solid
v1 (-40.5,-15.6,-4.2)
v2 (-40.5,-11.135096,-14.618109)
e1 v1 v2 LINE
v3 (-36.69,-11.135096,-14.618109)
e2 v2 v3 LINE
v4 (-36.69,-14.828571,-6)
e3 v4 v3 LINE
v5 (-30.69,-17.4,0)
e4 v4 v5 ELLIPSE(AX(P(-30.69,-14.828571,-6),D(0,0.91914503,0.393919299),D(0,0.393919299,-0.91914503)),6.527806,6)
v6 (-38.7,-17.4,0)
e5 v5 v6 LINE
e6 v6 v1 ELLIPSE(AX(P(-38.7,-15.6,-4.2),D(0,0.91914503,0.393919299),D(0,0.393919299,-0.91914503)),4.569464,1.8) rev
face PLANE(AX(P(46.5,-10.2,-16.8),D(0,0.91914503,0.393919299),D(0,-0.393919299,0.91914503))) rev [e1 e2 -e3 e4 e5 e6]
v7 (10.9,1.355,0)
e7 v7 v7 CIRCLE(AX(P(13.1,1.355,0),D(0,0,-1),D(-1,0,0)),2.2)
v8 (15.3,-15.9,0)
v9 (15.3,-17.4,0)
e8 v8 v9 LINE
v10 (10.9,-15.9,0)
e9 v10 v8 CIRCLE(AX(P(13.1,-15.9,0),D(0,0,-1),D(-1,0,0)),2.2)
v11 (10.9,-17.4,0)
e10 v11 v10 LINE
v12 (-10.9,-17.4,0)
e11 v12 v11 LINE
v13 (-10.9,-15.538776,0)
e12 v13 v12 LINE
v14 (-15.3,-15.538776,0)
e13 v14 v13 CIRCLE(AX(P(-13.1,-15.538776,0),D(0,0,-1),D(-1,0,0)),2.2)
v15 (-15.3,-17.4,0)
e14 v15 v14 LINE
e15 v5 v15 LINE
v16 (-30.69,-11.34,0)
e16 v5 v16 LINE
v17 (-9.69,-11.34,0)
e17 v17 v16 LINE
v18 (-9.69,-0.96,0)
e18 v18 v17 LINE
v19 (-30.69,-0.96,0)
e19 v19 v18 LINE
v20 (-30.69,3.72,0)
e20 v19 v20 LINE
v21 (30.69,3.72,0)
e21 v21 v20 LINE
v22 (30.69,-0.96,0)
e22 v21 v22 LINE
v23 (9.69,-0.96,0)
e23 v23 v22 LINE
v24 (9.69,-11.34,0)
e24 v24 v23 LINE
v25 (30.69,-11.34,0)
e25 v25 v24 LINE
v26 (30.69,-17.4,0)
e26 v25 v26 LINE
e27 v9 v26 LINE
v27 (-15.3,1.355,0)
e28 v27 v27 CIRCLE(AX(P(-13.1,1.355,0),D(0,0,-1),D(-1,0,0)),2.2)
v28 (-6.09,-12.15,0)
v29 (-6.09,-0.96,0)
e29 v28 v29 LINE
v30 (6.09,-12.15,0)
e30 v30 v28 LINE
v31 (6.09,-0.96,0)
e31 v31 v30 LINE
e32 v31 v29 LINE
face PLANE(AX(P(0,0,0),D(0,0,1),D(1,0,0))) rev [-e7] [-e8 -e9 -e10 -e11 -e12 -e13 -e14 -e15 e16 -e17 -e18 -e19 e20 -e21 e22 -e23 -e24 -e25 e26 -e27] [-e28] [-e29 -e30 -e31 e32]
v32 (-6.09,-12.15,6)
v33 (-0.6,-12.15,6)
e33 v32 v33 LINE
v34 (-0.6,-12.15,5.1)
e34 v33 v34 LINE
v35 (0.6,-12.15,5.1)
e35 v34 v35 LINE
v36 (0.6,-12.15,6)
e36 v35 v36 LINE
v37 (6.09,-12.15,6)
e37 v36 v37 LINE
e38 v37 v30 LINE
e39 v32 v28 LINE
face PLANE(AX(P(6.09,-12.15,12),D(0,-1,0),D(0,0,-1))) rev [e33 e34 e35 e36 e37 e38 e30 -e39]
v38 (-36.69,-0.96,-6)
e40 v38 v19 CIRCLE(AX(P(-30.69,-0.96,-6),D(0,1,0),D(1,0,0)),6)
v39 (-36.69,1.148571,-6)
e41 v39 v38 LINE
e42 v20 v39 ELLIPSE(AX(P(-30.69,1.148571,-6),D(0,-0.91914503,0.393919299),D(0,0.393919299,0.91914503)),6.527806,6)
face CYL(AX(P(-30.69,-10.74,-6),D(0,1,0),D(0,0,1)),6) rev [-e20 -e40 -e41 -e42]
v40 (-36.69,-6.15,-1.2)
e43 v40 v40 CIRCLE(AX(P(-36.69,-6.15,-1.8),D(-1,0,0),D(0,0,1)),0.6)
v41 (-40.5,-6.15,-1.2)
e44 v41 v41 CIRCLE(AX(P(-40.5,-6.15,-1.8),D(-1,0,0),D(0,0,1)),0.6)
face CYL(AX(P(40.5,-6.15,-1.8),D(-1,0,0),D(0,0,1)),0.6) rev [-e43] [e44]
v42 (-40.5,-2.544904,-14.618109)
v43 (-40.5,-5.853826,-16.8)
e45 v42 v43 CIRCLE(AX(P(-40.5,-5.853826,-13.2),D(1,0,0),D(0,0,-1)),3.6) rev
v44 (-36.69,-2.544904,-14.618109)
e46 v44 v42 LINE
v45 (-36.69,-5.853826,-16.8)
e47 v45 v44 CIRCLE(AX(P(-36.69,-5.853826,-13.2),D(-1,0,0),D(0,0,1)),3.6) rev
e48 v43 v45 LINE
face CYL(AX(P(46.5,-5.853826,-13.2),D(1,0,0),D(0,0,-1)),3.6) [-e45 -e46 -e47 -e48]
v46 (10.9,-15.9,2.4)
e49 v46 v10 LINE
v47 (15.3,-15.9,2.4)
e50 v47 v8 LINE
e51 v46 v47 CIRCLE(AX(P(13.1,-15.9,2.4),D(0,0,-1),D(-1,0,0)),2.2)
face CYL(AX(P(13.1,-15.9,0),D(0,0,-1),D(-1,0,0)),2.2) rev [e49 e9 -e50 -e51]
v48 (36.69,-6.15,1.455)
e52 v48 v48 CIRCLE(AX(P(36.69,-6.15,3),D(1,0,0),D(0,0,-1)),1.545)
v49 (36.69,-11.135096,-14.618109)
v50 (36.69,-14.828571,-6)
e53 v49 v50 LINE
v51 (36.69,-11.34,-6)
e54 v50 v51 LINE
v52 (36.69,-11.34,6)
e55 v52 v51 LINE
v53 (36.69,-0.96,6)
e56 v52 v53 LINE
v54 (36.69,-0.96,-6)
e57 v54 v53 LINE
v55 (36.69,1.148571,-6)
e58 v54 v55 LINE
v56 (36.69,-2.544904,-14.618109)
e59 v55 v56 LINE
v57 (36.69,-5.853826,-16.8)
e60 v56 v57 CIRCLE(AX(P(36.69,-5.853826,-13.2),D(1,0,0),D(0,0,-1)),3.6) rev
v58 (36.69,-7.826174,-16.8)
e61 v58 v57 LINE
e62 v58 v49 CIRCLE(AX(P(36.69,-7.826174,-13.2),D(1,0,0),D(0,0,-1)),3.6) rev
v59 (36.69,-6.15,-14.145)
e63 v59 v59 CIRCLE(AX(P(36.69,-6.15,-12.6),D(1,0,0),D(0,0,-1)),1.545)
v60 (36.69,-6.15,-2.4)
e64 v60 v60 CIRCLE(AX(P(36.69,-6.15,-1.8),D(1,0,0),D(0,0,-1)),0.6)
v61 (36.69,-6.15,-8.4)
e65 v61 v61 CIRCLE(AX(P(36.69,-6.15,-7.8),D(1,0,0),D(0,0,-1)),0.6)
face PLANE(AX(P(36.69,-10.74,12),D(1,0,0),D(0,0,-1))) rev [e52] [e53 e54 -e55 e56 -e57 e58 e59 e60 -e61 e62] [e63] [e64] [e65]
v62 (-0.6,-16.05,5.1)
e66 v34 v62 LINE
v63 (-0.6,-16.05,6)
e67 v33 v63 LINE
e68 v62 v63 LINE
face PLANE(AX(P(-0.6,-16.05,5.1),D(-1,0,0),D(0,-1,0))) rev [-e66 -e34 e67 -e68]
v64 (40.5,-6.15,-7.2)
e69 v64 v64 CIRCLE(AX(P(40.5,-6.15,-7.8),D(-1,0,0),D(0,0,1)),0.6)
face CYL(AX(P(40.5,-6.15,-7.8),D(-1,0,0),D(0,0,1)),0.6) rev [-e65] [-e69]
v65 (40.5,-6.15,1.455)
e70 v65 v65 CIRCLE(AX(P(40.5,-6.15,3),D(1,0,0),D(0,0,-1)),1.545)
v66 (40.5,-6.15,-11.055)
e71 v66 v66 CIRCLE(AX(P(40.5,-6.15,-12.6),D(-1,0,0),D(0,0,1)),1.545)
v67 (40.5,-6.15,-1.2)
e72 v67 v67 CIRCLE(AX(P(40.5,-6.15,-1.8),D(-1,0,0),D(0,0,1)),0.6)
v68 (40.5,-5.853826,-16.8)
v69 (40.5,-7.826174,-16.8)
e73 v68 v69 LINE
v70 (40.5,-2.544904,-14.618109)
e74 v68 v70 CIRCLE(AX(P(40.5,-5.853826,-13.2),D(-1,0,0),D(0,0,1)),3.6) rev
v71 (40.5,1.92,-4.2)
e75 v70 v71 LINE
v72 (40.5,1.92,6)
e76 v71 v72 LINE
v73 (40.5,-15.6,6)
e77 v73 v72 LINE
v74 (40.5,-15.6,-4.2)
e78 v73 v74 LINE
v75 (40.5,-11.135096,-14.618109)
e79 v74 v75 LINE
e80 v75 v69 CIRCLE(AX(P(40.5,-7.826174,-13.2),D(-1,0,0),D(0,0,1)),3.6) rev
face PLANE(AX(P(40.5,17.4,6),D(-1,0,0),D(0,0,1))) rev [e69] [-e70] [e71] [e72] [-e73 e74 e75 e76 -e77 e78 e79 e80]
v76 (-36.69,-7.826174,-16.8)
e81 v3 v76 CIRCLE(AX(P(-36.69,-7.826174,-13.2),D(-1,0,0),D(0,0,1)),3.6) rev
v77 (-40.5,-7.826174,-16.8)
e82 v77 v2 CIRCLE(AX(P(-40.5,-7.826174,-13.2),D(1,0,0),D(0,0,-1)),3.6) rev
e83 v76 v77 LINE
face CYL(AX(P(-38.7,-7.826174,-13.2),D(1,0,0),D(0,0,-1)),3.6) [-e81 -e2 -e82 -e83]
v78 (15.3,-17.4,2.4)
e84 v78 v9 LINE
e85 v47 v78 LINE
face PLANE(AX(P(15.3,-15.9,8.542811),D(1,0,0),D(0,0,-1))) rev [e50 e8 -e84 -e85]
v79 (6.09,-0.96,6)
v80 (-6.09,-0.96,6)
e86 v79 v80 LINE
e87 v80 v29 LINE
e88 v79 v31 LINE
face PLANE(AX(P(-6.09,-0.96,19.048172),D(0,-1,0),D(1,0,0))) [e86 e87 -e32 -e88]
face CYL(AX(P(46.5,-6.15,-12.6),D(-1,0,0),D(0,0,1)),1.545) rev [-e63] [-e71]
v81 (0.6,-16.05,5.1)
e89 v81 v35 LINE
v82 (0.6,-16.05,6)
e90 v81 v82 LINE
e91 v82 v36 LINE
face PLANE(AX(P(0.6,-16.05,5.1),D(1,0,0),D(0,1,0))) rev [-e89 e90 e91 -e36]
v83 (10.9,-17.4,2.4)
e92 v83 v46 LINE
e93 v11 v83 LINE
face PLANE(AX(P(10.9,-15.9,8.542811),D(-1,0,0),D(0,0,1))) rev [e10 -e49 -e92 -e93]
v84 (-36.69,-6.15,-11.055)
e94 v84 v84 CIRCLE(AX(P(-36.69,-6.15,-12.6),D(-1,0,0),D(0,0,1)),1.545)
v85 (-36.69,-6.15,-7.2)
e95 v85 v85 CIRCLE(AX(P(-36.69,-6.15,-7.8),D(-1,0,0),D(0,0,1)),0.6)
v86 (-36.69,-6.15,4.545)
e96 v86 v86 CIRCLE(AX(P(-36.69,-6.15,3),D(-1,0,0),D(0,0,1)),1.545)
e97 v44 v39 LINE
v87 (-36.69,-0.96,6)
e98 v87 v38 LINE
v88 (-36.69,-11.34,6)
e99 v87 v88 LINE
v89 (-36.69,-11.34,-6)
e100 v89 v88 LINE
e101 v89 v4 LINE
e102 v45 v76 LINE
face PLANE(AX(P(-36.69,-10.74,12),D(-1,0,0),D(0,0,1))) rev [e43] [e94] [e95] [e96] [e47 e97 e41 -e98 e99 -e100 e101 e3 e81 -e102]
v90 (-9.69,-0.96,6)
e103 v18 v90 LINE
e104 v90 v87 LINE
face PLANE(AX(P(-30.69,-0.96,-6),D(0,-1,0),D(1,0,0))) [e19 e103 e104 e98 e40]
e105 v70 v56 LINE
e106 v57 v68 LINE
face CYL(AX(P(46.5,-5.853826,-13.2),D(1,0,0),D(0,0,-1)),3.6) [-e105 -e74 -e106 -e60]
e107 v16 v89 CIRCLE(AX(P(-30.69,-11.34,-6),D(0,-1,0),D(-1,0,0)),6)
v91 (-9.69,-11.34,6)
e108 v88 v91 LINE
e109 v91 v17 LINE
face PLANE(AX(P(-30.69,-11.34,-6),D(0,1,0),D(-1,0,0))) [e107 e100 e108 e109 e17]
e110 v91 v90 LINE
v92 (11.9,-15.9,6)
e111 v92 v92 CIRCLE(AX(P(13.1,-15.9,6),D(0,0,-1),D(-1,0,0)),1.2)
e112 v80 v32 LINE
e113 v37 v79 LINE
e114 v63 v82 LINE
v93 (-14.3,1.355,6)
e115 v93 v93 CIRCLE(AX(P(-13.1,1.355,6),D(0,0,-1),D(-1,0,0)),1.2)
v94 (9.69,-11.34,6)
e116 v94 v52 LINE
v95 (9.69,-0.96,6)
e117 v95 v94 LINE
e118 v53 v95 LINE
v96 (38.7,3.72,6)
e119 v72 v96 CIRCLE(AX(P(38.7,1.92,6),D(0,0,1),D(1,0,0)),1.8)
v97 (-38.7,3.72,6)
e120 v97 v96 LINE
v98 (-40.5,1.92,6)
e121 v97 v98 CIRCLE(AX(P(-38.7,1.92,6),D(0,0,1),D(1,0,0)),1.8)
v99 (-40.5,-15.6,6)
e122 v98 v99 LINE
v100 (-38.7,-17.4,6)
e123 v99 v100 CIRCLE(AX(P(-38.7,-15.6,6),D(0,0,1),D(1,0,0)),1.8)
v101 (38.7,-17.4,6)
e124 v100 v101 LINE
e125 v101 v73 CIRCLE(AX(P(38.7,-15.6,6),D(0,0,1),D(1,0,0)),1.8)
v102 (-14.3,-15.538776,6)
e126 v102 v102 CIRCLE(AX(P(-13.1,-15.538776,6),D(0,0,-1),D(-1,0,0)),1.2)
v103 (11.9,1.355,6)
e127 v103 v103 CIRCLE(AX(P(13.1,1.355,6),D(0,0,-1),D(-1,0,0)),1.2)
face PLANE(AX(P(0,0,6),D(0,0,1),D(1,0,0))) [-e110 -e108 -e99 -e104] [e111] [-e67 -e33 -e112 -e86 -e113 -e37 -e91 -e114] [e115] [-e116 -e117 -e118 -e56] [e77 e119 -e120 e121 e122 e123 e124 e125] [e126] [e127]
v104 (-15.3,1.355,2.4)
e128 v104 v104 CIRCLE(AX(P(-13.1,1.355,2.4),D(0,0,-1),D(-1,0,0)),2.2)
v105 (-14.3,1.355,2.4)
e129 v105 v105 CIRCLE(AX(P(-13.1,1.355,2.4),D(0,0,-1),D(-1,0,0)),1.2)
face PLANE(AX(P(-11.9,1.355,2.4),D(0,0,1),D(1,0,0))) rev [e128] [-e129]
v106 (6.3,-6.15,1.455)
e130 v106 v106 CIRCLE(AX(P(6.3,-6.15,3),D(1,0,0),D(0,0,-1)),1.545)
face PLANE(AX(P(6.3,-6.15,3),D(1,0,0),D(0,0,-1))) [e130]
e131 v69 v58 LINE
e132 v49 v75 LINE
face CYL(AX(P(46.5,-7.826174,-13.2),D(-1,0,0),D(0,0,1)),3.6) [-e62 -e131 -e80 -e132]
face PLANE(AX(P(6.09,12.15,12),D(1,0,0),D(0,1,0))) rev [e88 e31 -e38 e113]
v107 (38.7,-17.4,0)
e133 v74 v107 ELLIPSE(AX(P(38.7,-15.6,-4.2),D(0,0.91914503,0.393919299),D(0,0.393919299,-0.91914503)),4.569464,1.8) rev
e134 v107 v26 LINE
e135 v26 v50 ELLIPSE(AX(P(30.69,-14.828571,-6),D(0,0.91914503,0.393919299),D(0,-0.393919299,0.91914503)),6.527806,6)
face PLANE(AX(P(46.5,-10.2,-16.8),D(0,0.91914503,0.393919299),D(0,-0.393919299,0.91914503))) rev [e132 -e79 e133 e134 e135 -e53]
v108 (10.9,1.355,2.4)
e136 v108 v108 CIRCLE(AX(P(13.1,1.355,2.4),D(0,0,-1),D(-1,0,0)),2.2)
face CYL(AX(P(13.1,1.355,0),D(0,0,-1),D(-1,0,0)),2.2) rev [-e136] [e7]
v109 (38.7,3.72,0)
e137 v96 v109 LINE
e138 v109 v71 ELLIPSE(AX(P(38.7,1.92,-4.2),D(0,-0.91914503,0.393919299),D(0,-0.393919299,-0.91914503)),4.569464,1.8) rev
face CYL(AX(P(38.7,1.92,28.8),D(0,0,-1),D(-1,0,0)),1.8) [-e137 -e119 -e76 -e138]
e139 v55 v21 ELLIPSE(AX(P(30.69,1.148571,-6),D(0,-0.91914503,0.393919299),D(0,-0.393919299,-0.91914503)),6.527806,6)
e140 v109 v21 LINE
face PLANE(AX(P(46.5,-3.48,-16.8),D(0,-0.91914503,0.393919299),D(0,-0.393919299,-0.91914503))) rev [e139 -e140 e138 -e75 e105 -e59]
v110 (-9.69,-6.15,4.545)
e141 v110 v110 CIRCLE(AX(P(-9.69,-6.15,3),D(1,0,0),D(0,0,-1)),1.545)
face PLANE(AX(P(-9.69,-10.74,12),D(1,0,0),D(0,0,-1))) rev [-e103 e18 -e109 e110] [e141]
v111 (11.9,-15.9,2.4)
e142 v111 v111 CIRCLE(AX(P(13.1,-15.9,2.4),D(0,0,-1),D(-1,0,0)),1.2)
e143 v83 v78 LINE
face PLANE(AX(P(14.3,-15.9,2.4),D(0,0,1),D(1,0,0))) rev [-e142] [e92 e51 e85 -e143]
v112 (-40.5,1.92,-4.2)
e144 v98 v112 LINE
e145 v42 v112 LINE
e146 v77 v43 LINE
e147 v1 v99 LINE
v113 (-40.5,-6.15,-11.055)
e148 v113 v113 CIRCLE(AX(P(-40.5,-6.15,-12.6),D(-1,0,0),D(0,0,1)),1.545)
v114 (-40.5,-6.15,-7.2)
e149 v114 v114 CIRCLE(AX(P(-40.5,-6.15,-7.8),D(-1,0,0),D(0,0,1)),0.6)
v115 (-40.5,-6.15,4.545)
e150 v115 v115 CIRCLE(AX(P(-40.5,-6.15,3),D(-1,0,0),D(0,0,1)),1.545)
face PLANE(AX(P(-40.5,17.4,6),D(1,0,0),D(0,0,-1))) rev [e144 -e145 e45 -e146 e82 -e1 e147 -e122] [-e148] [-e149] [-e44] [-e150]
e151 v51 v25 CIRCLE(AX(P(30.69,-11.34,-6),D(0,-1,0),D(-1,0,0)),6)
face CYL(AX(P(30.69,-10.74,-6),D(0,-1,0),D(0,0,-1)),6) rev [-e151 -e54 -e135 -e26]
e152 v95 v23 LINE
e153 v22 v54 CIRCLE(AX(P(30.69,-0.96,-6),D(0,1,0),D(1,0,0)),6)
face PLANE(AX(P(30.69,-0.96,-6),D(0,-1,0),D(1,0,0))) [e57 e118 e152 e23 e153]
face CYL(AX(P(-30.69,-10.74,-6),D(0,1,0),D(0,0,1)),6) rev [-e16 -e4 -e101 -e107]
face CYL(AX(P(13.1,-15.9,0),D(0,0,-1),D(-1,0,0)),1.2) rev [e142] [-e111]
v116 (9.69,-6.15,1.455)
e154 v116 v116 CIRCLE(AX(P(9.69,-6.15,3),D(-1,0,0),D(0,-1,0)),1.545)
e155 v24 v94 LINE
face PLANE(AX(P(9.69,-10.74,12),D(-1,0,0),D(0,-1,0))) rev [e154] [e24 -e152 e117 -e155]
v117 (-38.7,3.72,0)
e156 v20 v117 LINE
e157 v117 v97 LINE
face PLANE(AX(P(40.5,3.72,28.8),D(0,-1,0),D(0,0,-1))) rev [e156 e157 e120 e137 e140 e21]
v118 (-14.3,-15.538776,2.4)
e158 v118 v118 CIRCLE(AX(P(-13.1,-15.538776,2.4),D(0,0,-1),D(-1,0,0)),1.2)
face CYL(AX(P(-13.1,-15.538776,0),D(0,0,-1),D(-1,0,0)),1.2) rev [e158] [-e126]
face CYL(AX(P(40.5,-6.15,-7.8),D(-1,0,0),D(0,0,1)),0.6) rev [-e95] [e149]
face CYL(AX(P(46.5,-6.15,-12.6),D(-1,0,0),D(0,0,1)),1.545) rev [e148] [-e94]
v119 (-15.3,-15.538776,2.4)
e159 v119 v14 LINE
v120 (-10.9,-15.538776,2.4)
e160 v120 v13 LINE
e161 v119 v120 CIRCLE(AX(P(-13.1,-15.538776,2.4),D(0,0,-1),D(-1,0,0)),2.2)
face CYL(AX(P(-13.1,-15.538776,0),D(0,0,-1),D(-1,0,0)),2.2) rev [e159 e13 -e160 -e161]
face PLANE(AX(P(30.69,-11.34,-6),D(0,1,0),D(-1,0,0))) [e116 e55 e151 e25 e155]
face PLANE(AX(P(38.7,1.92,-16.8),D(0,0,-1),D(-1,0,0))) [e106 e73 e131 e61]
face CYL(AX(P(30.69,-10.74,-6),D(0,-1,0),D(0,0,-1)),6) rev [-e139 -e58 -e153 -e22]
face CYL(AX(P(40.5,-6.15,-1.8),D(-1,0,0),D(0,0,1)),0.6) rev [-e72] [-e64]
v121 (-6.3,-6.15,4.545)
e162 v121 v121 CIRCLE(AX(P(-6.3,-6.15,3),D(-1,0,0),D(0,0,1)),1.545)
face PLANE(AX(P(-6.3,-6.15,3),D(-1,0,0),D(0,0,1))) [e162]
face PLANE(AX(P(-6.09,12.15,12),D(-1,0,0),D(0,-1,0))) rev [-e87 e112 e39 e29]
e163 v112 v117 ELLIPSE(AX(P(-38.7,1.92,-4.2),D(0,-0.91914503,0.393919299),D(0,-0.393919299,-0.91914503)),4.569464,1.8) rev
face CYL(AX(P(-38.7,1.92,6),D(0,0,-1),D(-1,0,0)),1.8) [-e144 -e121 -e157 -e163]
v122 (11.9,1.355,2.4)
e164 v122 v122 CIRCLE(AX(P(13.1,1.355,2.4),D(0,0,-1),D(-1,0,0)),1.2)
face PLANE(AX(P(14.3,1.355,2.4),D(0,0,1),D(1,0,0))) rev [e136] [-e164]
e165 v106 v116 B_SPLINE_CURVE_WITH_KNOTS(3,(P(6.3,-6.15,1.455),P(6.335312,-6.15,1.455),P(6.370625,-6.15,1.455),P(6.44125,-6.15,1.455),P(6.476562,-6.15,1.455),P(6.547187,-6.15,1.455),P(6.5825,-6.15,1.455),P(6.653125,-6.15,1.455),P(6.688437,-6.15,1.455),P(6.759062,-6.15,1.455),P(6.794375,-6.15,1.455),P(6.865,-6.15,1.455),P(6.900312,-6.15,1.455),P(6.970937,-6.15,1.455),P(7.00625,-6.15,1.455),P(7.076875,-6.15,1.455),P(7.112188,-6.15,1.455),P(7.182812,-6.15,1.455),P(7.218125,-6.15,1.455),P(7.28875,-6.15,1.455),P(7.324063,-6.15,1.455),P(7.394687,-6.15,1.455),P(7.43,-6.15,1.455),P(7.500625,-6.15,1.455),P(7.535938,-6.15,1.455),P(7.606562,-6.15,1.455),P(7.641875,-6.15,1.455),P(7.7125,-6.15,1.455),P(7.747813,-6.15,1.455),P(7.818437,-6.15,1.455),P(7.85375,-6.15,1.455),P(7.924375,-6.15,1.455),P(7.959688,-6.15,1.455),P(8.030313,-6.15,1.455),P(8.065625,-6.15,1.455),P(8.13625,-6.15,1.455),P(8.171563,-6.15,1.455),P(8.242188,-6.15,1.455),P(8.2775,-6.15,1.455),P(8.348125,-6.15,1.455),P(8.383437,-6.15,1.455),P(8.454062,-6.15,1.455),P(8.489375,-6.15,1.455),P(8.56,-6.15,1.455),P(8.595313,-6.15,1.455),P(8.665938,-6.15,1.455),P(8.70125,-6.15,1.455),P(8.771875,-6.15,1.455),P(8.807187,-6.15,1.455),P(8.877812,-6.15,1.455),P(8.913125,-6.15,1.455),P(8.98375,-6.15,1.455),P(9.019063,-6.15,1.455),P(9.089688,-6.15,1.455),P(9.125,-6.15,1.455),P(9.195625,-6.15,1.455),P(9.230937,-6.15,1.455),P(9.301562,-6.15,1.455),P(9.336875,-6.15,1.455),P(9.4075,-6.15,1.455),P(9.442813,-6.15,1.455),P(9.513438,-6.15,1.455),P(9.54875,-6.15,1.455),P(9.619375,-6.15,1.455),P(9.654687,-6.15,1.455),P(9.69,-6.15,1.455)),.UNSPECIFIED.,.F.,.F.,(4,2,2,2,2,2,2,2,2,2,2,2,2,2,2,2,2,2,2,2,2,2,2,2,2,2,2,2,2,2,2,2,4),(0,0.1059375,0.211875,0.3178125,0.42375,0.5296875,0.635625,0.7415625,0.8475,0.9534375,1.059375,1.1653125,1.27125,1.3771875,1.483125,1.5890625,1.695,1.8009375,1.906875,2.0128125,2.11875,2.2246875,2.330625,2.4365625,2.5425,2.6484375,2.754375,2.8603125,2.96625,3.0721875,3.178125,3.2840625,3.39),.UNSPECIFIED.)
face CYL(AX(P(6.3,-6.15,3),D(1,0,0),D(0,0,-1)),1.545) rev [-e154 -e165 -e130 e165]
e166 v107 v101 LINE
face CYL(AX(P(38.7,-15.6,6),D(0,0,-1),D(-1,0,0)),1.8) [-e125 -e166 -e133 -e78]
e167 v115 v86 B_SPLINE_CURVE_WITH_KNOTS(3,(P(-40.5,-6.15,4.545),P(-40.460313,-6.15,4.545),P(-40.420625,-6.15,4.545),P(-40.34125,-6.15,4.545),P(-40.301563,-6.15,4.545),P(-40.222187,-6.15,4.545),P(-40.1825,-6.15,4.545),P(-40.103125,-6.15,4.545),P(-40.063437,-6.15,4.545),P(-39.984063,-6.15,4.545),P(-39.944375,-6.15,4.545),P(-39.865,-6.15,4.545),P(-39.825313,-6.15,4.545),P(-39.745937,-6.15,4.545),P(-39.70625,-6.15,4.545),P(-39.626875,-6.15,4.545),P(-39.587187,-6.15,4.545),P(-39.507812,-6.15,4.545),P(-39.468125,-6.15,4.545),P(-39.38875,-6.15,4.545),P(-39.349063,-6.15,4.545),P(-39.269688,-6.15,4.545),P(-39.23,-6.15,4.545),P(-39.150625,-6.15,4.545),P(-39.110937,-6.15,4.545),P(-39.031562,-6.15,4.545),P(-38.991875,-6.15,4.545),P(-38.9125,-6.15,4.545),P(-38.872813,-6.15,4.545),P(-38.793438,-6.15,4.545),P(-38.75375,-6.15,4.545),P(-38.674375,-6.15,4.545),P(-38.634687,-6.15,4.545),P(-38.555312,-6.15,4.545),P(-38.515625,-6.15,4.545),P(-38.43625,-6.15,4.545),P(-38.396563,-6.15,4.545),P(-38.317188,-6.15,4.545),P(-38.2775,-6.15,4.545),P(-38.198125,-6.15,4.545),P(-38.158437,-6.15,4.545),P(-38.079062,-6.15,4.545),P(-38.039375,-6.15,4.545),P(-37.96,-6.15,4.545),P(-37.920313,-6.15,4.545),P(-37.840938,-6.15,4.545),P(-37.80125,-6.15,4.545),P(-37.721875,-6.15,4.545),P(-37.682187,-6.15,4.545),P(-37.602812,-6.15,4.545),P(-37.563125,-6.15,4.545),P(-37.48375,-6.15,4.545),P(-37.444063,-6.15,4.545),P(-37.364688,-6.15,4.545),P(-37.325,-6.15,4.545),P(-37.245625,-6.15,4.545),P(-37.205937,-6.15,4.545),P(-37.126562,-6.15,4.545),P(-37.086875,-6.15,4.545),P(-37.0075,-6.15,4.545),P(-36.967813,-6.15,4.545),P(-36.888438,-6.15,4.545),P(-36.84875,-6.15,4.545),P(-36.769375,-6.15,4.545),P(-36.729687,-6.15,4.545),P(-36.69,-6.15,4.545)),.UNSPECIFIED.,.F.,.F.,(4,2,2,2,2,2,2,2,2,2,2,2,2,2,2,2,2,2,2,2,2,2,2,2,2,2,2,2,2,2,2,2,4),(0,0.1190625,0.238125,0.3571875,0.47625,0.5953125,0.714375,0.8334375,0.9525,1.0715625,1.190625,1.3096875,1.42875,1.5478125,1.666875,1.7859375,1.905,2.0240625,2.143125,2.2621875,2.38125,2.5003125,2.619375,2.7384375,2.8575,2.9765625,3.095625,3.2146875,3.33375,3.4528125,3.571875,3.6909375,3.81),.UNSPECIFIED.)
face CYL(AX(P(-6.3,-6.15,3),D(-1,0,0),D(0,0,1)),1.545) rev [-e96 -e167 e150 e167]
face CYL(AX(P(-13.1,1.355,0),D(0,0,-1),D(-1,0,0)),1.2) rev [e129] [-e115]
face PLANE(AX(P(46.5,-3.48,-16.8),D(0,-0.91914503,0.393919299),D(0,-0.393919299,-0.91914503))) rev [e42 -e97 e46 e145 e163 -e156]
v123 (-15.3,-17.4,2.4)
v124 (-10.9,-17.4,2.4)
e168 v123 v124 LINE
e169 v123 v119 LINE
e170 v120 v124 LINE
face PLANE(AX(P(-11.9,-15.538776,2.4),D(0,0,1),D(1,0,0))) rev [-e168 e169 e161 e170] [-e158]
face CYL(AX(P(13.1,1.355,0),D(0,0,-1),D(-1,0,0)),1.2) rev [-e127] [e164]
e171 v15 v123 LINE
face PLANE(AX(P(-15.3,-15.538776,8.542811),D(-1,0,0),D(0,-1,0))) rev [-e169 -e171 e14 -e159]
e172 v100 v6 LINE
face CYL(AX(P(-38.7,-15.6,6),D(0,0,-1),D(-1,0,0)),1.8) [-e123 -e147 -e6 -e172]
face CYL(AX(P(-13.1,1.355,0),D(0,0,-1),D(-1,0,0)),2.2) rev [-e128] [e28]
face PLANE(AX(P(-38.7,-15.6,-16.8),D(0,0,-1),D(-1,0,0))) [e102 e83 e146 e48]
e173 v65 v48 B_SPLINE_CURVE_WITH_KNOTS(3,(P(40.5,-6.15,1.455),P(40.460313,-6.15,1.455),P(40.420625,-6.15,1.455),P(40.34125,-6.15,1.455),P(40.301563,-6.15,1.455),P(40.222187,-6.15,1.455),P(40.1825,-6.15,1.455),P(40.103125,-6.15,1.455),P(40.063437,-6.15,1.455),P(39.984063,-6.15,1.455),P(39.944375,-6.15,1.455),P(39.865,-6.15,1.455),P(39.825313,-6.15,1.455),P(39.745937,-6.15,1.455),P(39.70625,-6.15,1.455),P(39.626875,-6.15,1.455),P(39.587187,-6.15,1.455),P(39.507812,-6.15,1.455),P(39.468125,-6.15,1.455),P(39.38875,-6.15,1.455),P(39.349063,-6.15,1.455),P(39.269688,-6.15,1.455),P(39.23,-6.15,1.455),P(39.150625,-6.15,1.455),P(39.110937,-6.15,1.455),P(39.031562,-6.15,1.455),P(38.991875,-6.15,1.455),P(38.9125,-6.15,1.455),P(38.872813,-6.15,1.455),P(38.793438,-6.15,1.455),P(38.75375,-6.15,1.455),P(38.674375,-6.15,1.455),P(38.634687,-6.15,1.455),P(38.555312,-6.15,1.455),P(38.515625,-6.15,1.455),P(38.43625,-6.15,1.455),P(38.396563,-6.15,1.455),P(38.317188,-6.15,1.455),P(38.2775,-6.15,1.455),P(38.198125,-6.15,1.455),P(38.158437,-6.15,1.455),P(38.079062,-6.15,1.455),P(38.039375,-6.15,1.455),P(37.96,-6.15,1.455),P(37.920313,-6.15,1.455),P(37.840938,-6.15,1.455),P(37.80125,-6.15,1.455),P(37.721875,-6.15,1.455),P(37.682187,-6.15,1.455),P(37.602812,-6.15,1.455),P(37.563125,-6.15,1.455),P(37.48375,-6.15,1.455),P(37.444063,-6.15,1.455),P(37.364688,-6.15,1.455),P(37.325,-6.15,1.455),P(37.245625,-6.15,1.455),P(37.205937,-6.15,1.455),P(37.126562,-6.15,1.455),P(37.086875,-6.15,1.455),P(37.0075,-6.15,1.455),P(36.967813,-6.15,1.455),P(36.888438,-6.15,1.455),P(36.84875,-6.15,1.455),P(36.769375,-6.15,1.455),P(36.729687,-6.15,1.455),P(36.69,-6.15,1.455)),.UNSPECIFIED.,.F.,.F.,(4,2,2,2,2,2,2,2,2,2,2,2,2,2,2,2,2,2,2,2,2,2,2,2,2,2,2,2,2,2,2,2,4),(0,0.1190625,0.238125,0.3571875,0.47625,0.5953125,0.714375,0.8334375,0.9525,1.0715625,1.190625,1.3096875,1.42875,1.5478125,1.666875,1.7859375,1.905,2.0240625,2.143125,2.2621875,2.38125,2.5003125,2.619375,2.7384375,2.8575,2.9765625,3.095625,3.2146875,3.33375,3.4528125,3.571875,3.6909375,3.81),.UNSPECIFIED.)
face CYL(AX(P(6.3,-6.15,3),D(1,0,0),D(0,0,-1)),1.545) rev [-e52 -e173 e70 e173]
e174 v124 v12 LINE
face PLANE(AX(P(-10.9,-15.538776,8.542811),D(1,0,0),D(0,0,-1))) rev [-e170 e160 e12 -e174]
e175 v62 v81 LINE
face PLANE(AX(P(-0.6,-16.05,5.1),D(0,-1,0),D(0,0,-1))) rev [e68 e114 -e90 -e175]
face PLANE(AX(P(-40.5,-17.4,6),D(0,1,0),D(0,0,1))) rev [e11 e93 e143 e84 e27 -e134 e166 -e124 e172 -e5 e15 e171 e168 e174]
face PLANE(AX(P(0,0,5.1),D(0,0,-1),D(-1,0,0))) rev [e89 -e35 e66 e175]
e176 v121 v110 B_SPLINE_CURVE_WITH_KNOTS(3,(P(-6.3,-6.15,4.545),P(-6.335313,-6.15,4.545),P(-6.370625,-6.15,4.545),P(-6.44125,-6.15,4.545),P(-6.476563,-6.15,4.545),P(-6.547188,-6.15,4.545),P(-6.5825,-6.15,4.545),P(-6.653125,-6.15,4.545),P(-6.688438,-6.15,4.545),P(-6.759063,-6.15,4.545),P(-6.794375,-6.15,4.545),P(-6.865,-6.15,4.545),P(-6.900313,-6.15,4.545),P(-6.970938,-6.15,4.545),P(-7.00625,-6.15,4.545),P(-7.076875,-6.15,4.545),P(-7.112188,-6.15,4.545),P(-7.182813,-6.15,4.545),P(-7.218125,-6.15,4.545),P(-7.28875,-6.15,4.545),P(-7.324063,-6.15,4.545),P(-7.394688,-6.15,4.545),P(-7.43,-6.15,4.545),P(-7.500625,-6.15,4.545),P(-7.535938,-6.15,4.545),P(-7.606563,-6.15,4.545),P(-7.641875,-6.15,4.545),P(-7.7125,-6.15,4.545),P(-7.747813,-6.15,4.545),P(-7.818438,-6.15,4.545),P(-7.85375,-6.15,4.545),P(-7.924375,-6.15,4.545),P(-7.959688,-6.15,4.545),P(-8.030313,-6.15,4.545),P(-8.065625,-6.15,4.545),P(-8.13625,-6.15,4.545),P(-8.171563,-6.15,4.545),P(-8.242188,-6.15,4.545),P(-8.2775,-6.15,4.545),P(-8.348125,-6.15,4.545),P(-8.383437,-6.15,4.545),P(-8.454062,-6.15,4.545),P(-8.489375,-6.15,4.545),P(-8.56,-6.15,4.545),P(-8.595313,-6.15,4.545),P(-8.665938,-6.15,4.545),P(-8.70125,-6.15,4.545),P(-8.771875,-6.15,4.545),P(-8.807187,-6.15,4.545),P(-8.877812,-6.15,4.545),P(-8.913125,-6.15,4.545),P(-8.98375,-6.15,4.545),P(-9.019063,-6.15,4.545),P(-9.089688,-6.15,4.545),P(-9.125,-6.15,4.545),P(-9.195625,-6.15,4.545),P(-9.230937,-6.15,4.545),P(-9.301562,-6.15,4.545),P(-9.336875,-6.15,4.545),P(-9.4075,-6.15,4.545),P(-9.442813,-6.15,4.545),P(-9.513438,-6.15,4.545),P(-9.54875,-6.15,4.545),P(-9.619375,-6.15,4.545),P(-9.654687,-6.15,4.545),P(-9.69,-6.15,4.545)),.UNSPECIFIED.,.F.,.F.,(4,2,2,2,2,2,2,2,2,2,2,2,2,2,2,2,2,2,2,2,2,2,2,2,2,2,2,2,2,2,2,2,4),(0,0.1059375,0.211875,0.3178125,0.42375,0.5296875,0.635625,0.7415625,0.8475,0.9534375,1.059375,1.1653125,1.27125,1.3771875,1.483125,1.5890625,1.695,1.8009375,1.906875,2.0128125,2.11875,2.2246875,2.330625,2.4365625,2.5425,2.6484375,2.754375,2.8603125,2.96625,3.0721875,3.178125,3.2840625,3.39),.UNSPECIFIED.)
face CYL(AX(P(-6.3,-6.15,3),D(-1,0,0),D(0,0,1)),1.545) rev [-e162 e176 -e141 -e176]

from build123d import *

# Parameters (mm, degrees)
SKETCH_1_W                   = 135
SKETCH_1_H                   = 58
EXTRUDE_1_DEPTH              = 10
SKETCH_3_W                   = 20.3
SKETCH_3_H                   = 40.5
CUT_EXTRUDE_1_DEPTH          = 20
SKETCH_4_R                   = 1.525
CUT_EXTRUDE_2_DEPTH          = 20
SKETCH_5_W                   = 45
SKETCH_5_H                   = 15.3
CUT_EXTRUDE_3_DEPTH          = 20
SKETCH_7_R                   = 2.575
CUT_EXTRUDE_4_DEPTH          = 57
SKETCH_9_W                   = 49.35
SKETCH_9_H                   = 22.8
CUT_EXTRUDE_6_DEPTH          = 48
FILLET_1_R                   = 3
FILLET_2_R                   = 3
CUT_EXTRUDE_START            = -57
SKETCH_10_R                  = 2.575
CUT_EXTRUDE_7_DEPTH          = 57
EXTRUDE_2_DEPTH              = 28
SKETCH_12_R                  = 2.575
CUT_EXTRUDE_8_DEPTH          = 145
CUT_EXTRUDE_9_DEPTH          = 145
FILLET_3_R                   = 6
FILLET_4_R                   = 10
SKETCH_14_R                  = 1
CUT_EXTRUDE_10_DEPTH         = 135
SKETCH_15_W                  = 2
SKETCH_15_H                  = 13
CUT_EXTRUDE_11_DEPTH         = 1.5
EXTRUDE_3_DEPTH              = 10
SKETCH_17_R                  = 1.5
CUT_EXTRUDE_12_DEPTH         = 8
FILLET_6_R                   = 10
SKETCH_18_R                  = 1.5
CUT_EXTRUDE_13_DEPTH         = 8
CUT_EXTRUDE_START_2          = -1
CUT_EXTRUDE_14_DEPTH         = 1
CUT_EXTRUDE_15_DEPTH         = 1
SCALE_1_SCALE                = 0.6
SKETCH_21_W                  = 36.846511631
SKETCH_21_H                  = 29.09734836
CUT_EXTRUDE_16_DEPTH         = 10
DELETE_FACE_1_OUTLINE_R      = 0.915
DELETE_FACE_1_DEPTH          = 6
DELETE_START                 = 12.6
DELETE_FACE_1_2_OUTLINE_R    = 0.9
DELETE_FACE_1_2_DEPTH        = 4.8
SKETCH_22_W                  = 42.319658251
SKETCH_22_H                  = 16.876277442
CUT_EXTRUDE_17_DEPTH         = 10
SKETCH_23_W                  = 12.18
SKETCH_23_H                  = 4.68
EXTRUDE_4_DEPTH              = 6
HOLE_WIZARD_M2_1_D           = 2.4
HOLE_WIZARD_M2_1_CBORE_D     = 4.4
HOLE_WIZARD_M2_1_CBORE_DEPTH = 2.4
SKETCH_28_W                  = 4.4
SKETCH_28_H                  = 3.92528177
SKETCH_28_H_2                = 4.286505362
CUT_EXTRUDE_18_DEPTH         = 2.4


# Read off the part's stored shape, not the designer's step: 删除面1
with BuildPart() as part:
    # 草图1 → 凸台-拉伸1 (new body)
    with BuildSketch(Plane.XY):
        Rectangle(SKETCH_1_W, SKETCH_1_H)
    extrude(amount=EXTRUDE_1_DEPTH)

    # 草图3 → 切除-拉伸1 (cut)
    with BuildSketch(Plane(origin=(0, 0, 0), x_dir=(-1, 0, 0), z_dir=(0, 0, -1))):
        Rectangle(SKETCH_3_W, SKETCH_3_H)
    extrude(amount=-CUT_EXTRUDE_1_DEPTH, mode=Mode.SUBTRACT)

    # 草图4 → 切除-拉伸2 (cut)
    with BuildSketch(Plane(origin=(0, 0, 0), x_dir=(-1, 0, 0), z_dir=(0, 0, -1))):
        with Locations((-5, 24.6)):
            Circle(SKETCH_4_R)
        with Locations(Location((5, 24.6, 0), (0, 0, 180))):
            Circle(SKETCH_4_R)
        with Locations((5, -24.6)):
            Circle(SKETCH_4_R)
        with Locations(Location((-5, -24.6, 0), (0, 0, 180))):
            Circle(SKETCH_4_R)
    extrude(amount=-CUT_EXTRUDE_2_DEPTH, mode=Mode.SUBTRACT)

    # 草图5 → 切除-拉伸3 (cut)
    with BuildSketch(Plane(origin=(0, 0, 0), x_dir=(-1, 0, 0), z_dir=(0, 0, -1))):
        with Locations((38.65, -10.25)):
            Rectangle(SKETCH_5_W, SKETCH_5_H)
        with Locations((-38.65, -10.25)):
            Rectangle(SKETCH_5_W, SKETCH_5_H)
    extrude(amount=-CUT_EXTRUDE_3_DEPTH, mode=Mode.SUBTRACT)

    # 草图7 → 切除-拉伸4 (cut)
    with BuildSketch(Plane.ZY.offset(67.5)):
        with Locations((5, -10.25)):
            Circle(SKETCH_7_R)
    extrude(amount=-CUT_EXTRUDE_4_DEPTH, mode=Mode.SUBTRACT)

    # 草图9 → 切除-拉伸6 (cut)
    with BuildSketch(Plane(origin=(0, 0, 0), x_dir=(-1, 0, 0), z_dir=(0, 0, -1))):
        with Locations((-42.825, 17.6)):
            Rectangle(SKETCH_9_W, SKETCH_9_H)
        with Locations((42.825, 17.6)):
            Rectangle(SKETCH_9_W, SKETCH_9_H)
    extrude(amount=-CUT_EXTRUDE_6_DEPTH, mode=Mode.SUBTRACT)

    # 圆角1
    fillet_1_edges = [part.edges().sort_by_distance(p)[0] for p in [
        (18.15, 29, 5),
        (18.15, 6.2, 5),
        (-18.15, 29, 5),
        (-18.15, 6.2, 5),
    ]]
    fillet(fillet_1_edges, radius=FILLET_1_R)

    # 圆角2
    fillet_2_edges = [part.edges().sort_by_distance(p)[0] for p in [
        (67.5, 6.2, 5),
        (-67.5, 6.2, 5),
        (67.5, -29, 5),
        (-67.5, -29, 5),
    ]]
    fillet(fillet_2_edges, radius=FILLET_2_R)

    # 草图10 → 切除-拉伸7 (cut)
    with BuildSketch(Plane(origin=(67.5, 0, 0), x_dir=(0, 0, -1), z_dir=(1, 0, 0)).offset(CUT_EXTRUDE_START)):
        with Locations(Location((-5, -10.25, 0), (0, 0, 180))):
            Circle(SKETCH_10_R)
    extrude(amount=CUT_EXTRUDE_7_DEPTH, mode=Mode.SUBTRACT)

    # 草图11 → 凸台-拉伸2 (add)
    with BuildSketch(Plane(origin=(0, 0, 0), x_dir=(-1, 0, 0), z_dir=(0, 0, -1))):
        with BuildLine():
            Line((61.15, 6.2), (61.15, -29))
            Line((61.15, -29), (64.5, -29))
            ThreePointArc((64.5, -29), (66.621320344, -28.121320344), (67.5, -26))
            Line((67.5, -26), (67.5, 3.2))
            ThreePointArc((67.5, 3.2), (66.621320344, 5.321320344), (64.5, 6.2))
            Line((64.5, 6.2), (61.15, 6.2))
        make_face()
        with BuildLine():
            Line((-61.15, 6.2), (-61.15, -29))
            Line((-61.15, -29), (-64.5, -29))
            ThreePointArc((-64.5, -29), (-66.621320344, -28.121320344), (-67.5, -26))
            Line((-67.5, -26), (-67.5, 3.2))
            ThreePointArc((-67.5, 3.2), (-66.621320344, 5.321320344), (-64.5, 6.2))
            Line((-64.5, 6.2), (-61.15, 6.2))
        make_face()
    extrude(amount=EXTRUDE_2_DEPTH)

    # 草图12 → 切除-拉伸8 (cut)
    with BuildSketch(Plane.ZY.offset(67.5)):
        with Locations((-21, -10.25)):
            Circle(SKETCH_12_R)
    extrude(amount=-CUT_EXTRUDE_8_DEPTH, mode=Mode.SUBTRACT)

    # 草图13 → 切除-拉伸9 (cut)
    with BuildSketch(Plane.ZY.offset(67.5)):
        Polygon((-28, 6.2), (-28, -5.8), (0, 6.2), align=None)
        Polygon((0, -29), (-28, -29), (-28, -17), align=None)
    extrude(amount=-CUT_EXTRUDE_9_DEPTH, mode=Mode.SUBTRACT)

    # 圆角3
    fillet_3_edges = [part.edges().sort_by_distance(p)[0] for p in [
        (64.325, -17, -28),
        (64.325, -5.8, -28),
        (-64.325, -5.8, -28),
        (-64.325, -17, -28),
    ]]
    fillet(fillet_3_edges, radius=FILLET_3_R)

    # 圆角4
    fillet_4_edges = [part.edges().sort_by_distance(p)[0] for p in [
        (-61.15, 1.8, 0),
        (-61.15, -23.45, 0),
        (61.15, -23.45, 0),
        (61.15, 1.8, 0),
    ]]
    fillet(fillet_4_edges, radius=FILLET_4_R)

    # 草图14 → 切除-拉伸10 (cut)
    with BuildSketch(Plane.ZY.offset(67.5)):
        with Locations((-13, -10.25)):
            Circle(SKETCH_14_R)
        with Locations((-3, -10.25)):
            Circle(SKETCH_14_R)
    extrude(amount=-CUT_EXTRUDE_10_DEPTH, mode=Mode.SUBTRACT)

    # 草图15 → 切除-拉伸11 (cut)
    with BuildSketch(Plane.XY.offset(10)):
        with Locations((0, 20.25)):
            Rectangle(SKETCH_15_W, SKETCH_15_H)
        with Locations((0, -20.25)):
            Rectangle(SKETCH_15_W, SKETCH_15_H)
    extrude(amount=-CUT_EXTRUDE_11_DEPTH, mode=Mode.SUBTRACT)

    # 草图16 → 凸台-拉伸3 (add)
    with BuildSketch(Plane(origin=(0, 0, 0), x_dir=(-1, 0, 0), z_dir=(0, 0, -1))):
        with BuildLine():
            Line((-18.15, 20.25), (18.15, 20.25))
            Line((18.15, 20.25), (18.15, 26))
            ThreePointArc((18.15, 26), (17.271320344, 28.121320344), (15.15, 29))
            Line((15.15, 29), (-15.15, 29))
            ThreePointArc((-15.15, 29), (-17.271320344, 28.121320344), (-18.15, 26))
            Line((-18.15, 26), (-18.15, 20.25))
        make_face()
    extrude(amount=EXTRUDE_3_DEPTH)

    # 草图17 → 切除-拉伸12 (cut)
    with BuildSketch(Plane(origin=(0, 29, 0), x_dir=(1, 0, 0), z_dir=(0, 1, 0))):
        with Locations(Location((-9, 6, 0), (0, 0, 270))):
            Circle(SKETCH_17_R)
        with Locations(Location((9, 6, 0), (0, 0, 270))):
            Circle(SKETCH_17_R)
        with Locations(Location((9, -6, 0), (0, 0, 270))):
            Circle(SKETCH_17_R)
        with Locations(Location((-9, -6, 0), (0, 0, 270))):
            Circle(SKETCH_17_R)
    extrude(amount=-CUT_EXTRUDE_12_DEPTH, mode=Mode.SUBTRACT)

    # 圆角6
    fillet_6_edges = [part.edges().sort_by_distance(p)[0] for p in [
        (-14.15, 20.25, 0),
        (14.15, 20.25, 0),
    ]]
    fillet(fillet_6_edges, radius=FILLET_6_R - 0.0001)  # a hair under: the kernel refuses the full size

    # 草图18 → 切除-拉伸13 (cut)
    with BuildSketch(Plane(origin=(0, 21, 0), x_dir=(1, 0, 0), z_dir=(0, 1, 0))):
        with Locations(Location((9, 6, 0), (0, 0, 270))):
            Circle(SKETCH_18_R)
        with Locations(Location((-9, 6, 0), (0, 0, 270))):
            Circle(SKETCH_18_R)
    extrude(amount=-CUT_EXTRUDE_13_DEPTH, mode=Mode.SUBTRACT)

    # 草图19 → 切除-拉伸14 (cut)
    with BuildSketch(Plane(origin=(0, -17.9, 0), x_dir=(1, 0, 0), z_dir=(0, 1, 0)).offset(CUT_EXTRUDE_START_2)):
        with BuildLine():
            Line((16.15, -10), (61.15, -10))
            Line((61.15, -10), (61.15, 10))
            ThreePointArc((61.15, 10), (58.221067812, 2.928932188), (51.15, 0))
            Line((51.15, 0), (16.15, 0))
            Line((16.15, 0), (16.15, -10))
        make_face()
        with BuildLine():
            Line((-61.15, -10), (-16.15, -10))
            Line((-16.15, -10), (-16.15, 0))
            Line((-16.15, 0), (-51.15, 0))
            ThreePointArc((-51.15, 0), (-58.221067812, 2.928932188), (-61.15, 10))
            Line((-61.15, 10), (-61.15, -10))
        make_face()
    extrude(amount=CUT_EXTRUDE_14_DEPTH, mode=Mode.SUBTRACT)

    # 草图20 → 切除-拉伸15 (cut)
    with BuildSketch(Plane.XZ.offset(2.6)):
        with BuildLine():
            Line((-16.15, 10), (-61.15, 10))
            Line((-61.15, 10), (-61.15, -10))
            ThreePointArc((-61.15, -10), (-58.221067812, -2.928932188), (-51.15, 0))
            Line((-51.15, 0), (-16.15, 0))
            Line((-16.15, 0), (-16.15, 10))
        make_face()
        with BuildLine():
            Line((61.15, 10), (16.15, 10))
            Line((16.15, 10), (16.15, 0))
            Line((16.15, 0), (51.15, 0))
            ThreePointArc((51.15, 0), (58.221067812, -2.928932188), (61.15, -10))
            Line((61.15, -10), (61.15, 10))
        make_face()
    extrude(amount=-CUT_EXTRUDE_15_DEPTH, mode=Mode.SUBTRACT)


with BuildPart() as part_1:
    # 缩放比例1: scaled about (0, 0, 0)
    add(part.part.scale(SCALE_1_SCALE))

    # 草图21 → 切除-拉伸16 (cut)
    with BuildSketch(Plane(origin=(0, 0, 0), x_dir=(-1, 0, 0), z_dir=(0, 0, -1))):
        with Locations((0.657510419, 15.53719691)):
            Rectangle(SKETCH_21_W, SKETCH_21_H)
    extrude(amount=CUT_EXTRUDE_16_DEPTH, mode=Mode.SUBTRACT)

    # Delete Face 1 outline → Delete Face 1 (add)
    with BuildSketch(Plane.XY):
        with Locations((3, 14.76)):
            Circle(DELETE_FACE_1_OUTLINE_R)
        with Locations((-3, 14.76)):
            Circle(DELETE_FACE_1_OUTLINE_R)
        with Locations((-3, -14.76)):
            Circle(DELETE_FACE_1_OUTLINE_R)
        with Locations((3, -14.76)):
            Circle(DELETE_FACE_1_OUTLINE_R)
    extrude(amount=DELETE_FACE_1_DEPTH)

    # Delete Face 1 2 outline → Delete Face 1 2 (add)
    with BuildSketch(Plane(origin=(0, 0, 0), x_dir=(1, 0, 0), z_dir=(0, 1, 0)).offset(DELETE_START)):
        with Locations((5.4, -3.6)):
            Circle(DELETE_FACE_1_2_OUTLINE_R)
        with Locations((-5.4, -3.6)):
            Circle(DELETE_FACE_1_2_OUTLINE_R)
    extrude(amount=DELETE_FACE_1_2_DEPTH)

    # 草图22 → 切除-拉伸17 (cut)
    with BuildSketch(Plane(origin=(0, 0, 0), x_dir=(-1, 0, 0), z_dir=(0, 0, -1))):
        with Locations((1.658514494, 12.158138721)):
            Rectangle(SKETCH_22_W, SKETCH_22_H)
    extrude(amount=-CUT_EXTRUDE_17_DEPTH, mode=Mode.SUBTRACT)

    # 草图23 → 凸台-拉伸4 (add)
    with BuildSketch(Plane(origin=(0, 0, 0), x_dir=(-1, 0, 0), z_dir=(0, 0, -1))):
        with Locations((0, 1.38)):
            Rectangle(SKETCH_23_W, SKETCH_23_H)
    extrude(amount=-EXTRUDE_4_DEPTH)

    # M2 六角凹头螺钉的柱形沉头孔1 (through all)
    with Locations(Plane(origin=(0, 0, 0), x_dir=(-1, 0, 0), z_dir=(0, 0, -1))):
        with Locations((13.1, 1.355), (-13.1, 1.355), (-13.1, -15.9), (13.1, -15.538776408)):
            CounterBoreHole(HOLE_WIZARD_M2_1_D / 2, HOLE_WIZARD_M2_1_CBORE_D / 2, HOLE_WIZARD_M2_1_CBORE_DEPTH)

    # 草图28 → 切除-拉伸18 (cut)
    with BuildSketch(Plane(origin=(0, 0, 0), x_dir=(-1, 0, 0), z_dir=(0, 0, -1))):
        with Locations((-13.1, -17.862640885)):
            Rectangle(SKETCH_28_W, SKETCH_28_H)
        with Locations((13.1, -17.682029089)):
            Rectangle(SKETCH_28_W, SKETCH_28_H_2)
    extrude(amount=-CUT_EXTRUDE_18_DEPTH, mode=Mode.SUBTRACT)


solid = part_1.part
